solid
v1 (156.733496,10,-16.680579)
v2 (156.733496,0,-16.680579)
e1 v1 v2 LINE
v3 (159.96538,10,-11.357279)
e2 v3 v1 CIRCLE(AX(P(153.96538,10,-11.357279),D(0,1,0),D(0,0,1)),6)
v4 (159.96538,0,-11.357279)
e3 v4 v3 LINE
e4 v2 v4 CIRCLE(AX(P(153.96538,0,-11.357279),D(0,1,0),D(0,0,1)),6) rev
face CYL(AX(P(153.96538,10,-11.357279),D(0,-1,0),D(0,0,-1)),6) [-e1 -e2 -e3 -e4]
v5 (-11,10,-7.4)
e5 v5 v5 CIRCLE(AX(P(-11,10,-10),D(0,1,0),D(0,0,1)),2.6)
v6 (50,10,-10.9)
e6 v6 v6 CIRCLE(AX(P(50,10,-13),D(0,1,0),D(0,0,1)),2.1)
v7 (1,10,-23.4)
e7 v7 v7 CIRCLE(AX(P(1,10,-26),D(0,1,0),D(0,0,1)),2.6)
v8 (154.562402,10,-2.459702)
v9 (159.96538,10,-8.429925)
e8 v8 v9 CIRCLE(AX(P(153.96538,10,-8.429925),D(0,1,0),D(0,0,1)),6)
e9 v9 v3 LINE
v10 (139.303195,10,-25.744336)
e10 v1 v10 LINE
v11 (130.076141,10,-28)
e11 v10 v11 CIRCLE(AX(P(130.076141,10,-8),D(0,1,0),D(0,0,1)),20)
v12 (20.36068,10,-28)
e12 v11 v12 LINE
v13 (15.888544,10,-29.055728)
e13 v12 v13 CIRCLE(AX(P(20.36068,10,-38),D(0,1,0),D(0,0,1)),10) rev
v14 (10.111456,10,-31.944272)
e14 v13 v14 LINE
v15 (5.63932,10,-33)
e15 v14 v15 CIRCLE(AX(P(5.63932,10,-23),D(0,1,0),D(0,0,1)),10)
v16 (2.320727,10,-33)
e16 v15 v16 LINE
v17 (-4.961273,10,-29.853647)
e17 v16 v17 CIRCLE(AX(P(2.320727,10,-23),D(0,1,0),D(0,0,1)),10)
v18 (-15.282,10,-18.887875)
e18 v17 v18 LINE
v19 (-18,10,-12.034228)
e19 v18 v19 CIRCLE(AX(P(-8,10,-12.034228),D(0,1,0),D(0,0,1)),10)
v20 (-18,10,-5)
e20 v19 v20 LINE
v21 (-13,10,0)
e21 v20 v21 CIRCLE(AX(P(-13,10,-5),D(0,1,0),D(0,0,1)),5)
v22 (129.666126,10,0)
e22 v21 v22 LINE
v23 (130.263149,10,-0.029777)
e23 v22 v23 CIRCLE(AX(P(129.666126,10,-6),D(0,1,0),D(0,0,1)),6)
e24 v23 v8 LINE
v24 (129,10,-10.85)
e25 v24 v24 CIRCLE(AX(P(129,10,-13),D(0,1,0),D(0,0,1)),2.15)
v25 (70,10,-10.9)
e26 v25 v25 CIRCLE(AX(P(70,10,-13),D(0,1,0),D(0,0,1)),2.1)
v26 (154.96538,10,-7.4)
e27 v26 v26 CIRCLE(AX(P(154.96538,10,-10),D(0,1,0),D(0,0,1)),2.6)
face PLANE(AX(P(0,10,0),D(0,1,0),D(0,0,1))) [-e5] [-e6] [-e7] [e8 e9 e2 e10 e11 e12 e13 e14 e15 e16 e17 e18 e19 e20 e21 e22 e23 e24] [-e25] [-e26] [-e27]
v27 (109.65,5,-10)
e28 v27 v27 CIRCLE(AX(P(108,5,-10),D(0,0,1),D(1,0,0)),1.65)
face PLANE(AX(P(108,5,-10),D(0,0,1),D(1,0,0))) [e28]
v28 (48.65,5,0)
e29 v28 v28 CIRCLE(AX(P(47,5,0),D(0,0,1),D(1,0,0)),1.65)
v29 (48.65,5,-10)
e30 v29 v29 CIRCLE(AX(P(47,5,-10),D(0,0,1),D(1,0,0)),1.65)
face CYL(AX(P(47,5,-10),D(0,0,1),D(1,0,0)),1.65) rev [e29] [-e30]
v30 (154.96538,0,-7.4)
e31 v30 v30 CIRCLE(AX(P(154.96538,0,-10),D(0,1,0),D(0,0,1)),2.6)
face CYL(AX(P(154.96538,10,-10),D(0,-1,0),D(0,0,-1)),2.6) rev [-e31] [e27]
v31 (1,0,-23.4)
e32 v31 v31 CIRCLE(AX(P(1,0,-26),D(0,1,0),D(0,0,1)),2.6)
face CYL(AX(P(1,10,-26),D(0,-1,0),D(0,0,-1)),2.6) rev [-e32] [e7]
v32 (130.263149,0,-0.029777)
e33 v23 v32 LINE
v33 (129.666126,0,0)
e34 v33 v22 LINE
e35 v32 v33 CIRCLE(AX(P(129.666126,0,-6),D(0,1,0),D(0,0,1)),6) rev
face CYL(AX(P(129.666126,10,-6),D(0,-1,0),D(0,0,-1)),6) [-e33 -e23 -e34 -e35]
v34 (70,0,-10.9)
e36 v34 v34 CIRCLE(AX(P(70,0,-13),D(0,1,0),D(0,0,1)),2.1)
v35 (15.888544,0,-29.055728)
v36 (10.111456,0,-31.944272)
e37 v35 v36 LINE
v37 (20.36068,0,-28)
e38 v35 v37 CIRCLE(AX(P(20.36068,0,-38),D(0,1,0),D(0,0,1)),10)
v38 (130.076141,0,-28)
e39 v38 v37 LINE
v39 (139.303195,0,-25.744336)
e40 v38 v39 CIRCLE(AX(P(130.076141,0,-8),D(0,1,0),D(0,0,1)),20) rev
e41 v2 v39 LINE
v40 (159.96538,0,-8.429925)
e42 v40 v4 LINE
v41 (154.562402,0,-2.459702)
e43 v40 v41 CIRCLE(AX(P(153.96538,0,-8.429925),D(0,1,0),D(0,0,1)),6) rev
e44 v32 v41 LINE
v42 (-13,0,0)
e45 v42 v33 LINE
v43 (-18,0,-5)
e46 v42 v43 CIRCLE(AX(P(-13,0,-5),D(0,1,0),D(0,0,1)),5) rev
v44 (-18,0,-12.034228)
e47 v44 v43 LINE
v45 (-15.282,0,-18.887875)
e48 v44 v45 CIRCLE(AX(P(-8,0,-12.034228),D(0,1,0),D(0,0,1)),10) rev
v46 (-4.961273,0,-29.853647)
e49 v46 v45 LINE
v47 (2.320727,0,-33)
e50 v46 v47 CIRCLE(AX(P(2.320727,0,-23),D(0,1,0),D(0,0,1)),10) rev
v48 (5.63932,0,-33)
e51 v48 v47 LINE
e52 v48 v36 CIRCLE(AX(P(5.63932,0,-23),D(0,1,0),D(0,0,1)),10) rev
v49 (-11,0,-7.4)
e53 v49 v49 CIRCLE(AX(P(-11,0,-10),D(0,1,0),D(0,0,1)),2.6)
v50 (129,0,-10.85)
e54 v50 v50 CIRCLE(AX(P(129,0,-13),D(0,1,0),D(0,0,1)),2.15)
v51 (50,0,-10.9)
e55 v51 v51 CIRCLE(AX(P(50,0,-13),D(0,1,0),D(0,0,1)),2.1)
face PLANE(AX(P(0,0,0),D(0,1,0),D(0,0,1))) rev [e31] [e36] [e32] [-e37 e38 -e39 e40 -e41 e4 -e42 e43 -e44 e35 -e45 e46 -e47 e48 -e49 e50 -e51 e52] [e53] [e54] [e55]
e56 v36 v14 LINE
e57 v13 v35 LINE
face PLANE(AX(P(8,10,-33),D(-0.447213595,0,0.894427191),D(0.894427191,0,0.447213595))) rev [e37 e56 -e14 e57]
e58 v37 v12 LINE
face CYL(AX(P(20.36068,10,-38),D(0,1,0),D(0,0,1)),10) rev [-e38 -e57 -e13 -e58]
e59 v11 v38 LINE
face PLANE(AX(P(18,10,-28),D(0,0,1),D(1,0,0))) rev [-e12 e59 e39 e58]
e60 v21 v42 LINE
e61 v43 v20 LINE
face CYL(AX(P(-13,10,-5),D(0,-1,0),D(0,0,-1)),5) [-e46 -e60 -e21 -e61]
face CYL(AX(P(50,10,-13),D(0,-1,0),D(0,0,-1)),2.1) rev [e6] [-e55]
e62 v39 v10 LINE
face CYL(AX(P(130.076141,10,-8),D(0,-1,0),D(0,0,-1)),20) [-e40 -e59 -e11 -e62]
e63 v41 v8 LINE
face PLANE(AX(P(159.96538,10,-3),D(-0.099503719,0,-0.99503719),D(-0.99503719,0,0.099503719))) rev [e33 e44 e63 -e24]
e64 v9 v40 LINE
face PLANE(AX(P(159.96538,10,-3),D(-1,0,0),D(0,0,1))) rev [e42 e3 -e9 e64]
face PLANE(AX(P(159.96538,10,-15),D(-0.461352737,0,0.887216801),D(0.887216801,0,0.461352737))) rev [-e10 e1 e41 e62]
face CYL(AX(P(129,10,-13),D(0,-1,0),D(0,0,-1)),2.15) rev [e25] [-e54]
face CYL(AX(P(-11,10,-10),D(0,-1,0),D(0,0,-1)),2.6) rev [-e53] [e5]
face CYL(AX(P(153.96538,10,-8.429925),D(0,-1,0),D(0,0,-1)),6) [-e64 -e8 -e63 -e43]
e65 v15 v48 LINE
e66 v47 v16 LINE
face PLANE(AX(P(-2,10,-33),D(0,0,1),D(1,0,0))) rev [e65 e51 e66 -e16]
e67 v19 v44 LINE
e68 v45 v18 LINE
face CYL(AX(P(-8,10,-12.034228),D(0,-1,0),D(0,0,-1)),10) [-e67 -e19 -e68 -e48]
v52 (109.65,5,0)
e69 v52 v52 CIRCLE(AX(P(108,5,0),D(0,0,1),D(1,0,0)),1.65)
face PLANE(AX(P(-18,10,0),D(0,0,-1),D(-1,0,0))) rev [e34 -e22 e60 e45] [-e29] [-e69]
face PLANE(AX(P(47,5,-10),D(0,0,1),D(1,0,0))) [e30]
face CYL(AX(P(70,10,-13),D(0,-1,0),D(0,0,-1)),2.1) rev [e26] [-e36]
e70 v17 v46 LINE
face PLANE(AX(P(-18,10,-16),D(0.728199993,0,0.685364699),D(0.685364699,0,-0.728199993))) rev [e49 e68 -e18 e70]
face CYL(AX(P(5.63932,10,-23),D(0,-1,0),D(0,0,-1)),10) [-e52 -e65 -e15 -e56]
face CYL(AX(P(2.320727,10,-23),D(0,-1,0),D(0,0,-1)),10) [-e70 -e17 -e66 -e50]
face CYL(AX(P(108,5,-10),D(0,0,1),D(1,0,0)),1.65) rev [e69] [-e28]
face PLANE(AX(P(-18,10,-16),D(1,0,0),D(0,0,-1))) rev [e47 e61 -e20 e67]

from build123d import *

# Parameters (mm, degrees)
SKETCH1_R           = 2.6
SKETCH1_R_2         = 2.15
SKETCH1_R_3         = 2.1
BOSS_EXTRUDE1_DEPTH = 10
FILLET1_R           = 5
FILLET2_R           = 6
FILLET3_R           = 10
FILLET4_R           = 20
FILLET5_R           = 10
SKETCH2_R           = 1.65
CUT_EXTRUDE1_DEPTH  = 10


with BuildPart() as part:
    # Sketch1 → Boss-Extrude1 (new body)
    with BuildSketch(Plane(origin=(0, 0, 0), x_dir=(1, 0, 0), z_dir=(0, 1, 0))):
        Polygon((159.965380006, 15), (134.965380006, 28), (18, 28), (8, 33), (-2, 33), (-18, 16), (-18, 0), (0, 0), (129.965380006, 0), (159.965380006, 3), align=None)
        with Locations(Location((-11, 10, 0), (0, 0, 270))):
            Circle(SKETCH1_R, mode=Mode.SUBTRACT)
        with Locations(Location((129, 13, 0), (0, 0, 270))):
            Circle(SKETCH1_R_2, mode=Mode.SUBTRACT)
        with Locations(Location((154.965380006, 10, 0), (0, 0, 270))):
            Circle(SKETCH1_R, mode=Mode.SUBTRACT)
        with Locations(Location((1, 26, 0), (0, 0, 270))):
            Circle(SKETCH1_R, mode=Mode.SUBTRACT)
        with Locations(Location((50, 13, 0), (0, 0, 270))):
            Circle(SKETCH1_R_3, mode=Mode.SUBTRACT)
        with Locations(Location((70, 13, 0), (0, 0, 270))):
            Circle(SKETCH1_R_3, mode=Mode.SUBTRACT)
    extrude(amount=BOSS_EXTRUDE1_DEPTH)

    # Fillet1
    fillet1_edges = [part.edges().sort_by_distance(p)[0] for p in [
        (-18, 5, 0),
    ]]
    fillet(fillet1_edges, radius=FILLET1_R)

    # Fillet2
    # the kernel refuses this fillet: 6 mm, written as the material it takes off along each edge
    with BuildSketch(Plane(origin=(159.965380006, -9.106803364, -15), x_dir=(0, 0, 1), z_dir=(0, 1, 0))) as fillet2_piece_1:
        with BuildLine():
            CenterArc((FILLET2_R * 0.607120224288, -FILLET2_R), FILLET2_R, 90, 62.525568374)
            Line((-FILLET2_R * 0.280096576946, -FILLET2_R * 0.538647263358), (0, 0))
            Line((0, 0), (FILLET2_R * 0.607120224288, 0))
        make_face()
    extrude(amount=28.213606729, mode=Mode.SUBTRACT)
    with BuildSketch(Plane(origin=(159.965380006, -13.574813432, -3), x_dir=(-0.9950371902099892, 0, 0.0995037190209987), z_dir=(0, 1, 0))) as fillet2_piece_2:
        with BuildLine():
            CenterArc((FILLET2_R * 0.904987562112, -FILLET2_R), FILLET2_R, 90, 84.289406863)
            Line((-FILLET2_R * 0.0900496280979, -FILLET2_R * 0.900496280979), (0, 0))
            Line((0, 0), (FILLET2_R * 0.904987562112, 0))
        make_face()
    extrude(amount=37.149626863, mode=Mode.SUBTRACT)
    with BuildSketch(Plane(origin=(129.965380006, -0.748134317, 0), x_dir=(-1, 0, 0), z_dir=(0, 1, 0))) as fillet2_piece_3:
        with BuildLine():
            CenterArc((FILLET2_R * 0.0498756211209, -FILLET2_R), FILLET2_R, 90, 5.710593137)
            Line((-FILLET2_R * 0.0496280979001, -FILLET2_R * 0.00496280979001), (0, 0))
            Line((0, 0), (FILLET2_R * 0.0498756211209, 0))
        make_face()
    extrude(amount=11.496268634, mode=Mode.SUBTRACT)

    # Fillet3
    fillet3_edges = [part.edges().sort_by_distance(p)[0] for p in [
        (-18, 5, -16),
        (-2, 5, -33),
    ]]
    fillet(fillet3_edges, radius=FILLET3_R)

    # Fillet4
    fillet4_edges = [part.edges().sort_by_distance(p)[0] for p in [
        (134.965380006, 5, -28),
    ]]
    fillet(fillet4_edges, radius=FILLET4_R)

    # Fillet5
    fillet5_edges = [part.edges().sort_by_distance(p)[0] for p in [
        (8, 5, -33),
        (18, 5, -28),
    ]]
    fillet(fillet5_edges, radius=FILLET5_R)

    # Sketch2 → Cut-Extrude1 (cut)
    with BuildSketch(Plane.XY):
        with Locations((47, 5)):
            Circle(SKETCH2_R)
        with Locations((108, 5)):
            Circle(SKETCH2_R)
    extrude(amount=-CUT_EXTRUDE1_DEPTH, mode=Mode.SUBTRACT)


solid = part.part
